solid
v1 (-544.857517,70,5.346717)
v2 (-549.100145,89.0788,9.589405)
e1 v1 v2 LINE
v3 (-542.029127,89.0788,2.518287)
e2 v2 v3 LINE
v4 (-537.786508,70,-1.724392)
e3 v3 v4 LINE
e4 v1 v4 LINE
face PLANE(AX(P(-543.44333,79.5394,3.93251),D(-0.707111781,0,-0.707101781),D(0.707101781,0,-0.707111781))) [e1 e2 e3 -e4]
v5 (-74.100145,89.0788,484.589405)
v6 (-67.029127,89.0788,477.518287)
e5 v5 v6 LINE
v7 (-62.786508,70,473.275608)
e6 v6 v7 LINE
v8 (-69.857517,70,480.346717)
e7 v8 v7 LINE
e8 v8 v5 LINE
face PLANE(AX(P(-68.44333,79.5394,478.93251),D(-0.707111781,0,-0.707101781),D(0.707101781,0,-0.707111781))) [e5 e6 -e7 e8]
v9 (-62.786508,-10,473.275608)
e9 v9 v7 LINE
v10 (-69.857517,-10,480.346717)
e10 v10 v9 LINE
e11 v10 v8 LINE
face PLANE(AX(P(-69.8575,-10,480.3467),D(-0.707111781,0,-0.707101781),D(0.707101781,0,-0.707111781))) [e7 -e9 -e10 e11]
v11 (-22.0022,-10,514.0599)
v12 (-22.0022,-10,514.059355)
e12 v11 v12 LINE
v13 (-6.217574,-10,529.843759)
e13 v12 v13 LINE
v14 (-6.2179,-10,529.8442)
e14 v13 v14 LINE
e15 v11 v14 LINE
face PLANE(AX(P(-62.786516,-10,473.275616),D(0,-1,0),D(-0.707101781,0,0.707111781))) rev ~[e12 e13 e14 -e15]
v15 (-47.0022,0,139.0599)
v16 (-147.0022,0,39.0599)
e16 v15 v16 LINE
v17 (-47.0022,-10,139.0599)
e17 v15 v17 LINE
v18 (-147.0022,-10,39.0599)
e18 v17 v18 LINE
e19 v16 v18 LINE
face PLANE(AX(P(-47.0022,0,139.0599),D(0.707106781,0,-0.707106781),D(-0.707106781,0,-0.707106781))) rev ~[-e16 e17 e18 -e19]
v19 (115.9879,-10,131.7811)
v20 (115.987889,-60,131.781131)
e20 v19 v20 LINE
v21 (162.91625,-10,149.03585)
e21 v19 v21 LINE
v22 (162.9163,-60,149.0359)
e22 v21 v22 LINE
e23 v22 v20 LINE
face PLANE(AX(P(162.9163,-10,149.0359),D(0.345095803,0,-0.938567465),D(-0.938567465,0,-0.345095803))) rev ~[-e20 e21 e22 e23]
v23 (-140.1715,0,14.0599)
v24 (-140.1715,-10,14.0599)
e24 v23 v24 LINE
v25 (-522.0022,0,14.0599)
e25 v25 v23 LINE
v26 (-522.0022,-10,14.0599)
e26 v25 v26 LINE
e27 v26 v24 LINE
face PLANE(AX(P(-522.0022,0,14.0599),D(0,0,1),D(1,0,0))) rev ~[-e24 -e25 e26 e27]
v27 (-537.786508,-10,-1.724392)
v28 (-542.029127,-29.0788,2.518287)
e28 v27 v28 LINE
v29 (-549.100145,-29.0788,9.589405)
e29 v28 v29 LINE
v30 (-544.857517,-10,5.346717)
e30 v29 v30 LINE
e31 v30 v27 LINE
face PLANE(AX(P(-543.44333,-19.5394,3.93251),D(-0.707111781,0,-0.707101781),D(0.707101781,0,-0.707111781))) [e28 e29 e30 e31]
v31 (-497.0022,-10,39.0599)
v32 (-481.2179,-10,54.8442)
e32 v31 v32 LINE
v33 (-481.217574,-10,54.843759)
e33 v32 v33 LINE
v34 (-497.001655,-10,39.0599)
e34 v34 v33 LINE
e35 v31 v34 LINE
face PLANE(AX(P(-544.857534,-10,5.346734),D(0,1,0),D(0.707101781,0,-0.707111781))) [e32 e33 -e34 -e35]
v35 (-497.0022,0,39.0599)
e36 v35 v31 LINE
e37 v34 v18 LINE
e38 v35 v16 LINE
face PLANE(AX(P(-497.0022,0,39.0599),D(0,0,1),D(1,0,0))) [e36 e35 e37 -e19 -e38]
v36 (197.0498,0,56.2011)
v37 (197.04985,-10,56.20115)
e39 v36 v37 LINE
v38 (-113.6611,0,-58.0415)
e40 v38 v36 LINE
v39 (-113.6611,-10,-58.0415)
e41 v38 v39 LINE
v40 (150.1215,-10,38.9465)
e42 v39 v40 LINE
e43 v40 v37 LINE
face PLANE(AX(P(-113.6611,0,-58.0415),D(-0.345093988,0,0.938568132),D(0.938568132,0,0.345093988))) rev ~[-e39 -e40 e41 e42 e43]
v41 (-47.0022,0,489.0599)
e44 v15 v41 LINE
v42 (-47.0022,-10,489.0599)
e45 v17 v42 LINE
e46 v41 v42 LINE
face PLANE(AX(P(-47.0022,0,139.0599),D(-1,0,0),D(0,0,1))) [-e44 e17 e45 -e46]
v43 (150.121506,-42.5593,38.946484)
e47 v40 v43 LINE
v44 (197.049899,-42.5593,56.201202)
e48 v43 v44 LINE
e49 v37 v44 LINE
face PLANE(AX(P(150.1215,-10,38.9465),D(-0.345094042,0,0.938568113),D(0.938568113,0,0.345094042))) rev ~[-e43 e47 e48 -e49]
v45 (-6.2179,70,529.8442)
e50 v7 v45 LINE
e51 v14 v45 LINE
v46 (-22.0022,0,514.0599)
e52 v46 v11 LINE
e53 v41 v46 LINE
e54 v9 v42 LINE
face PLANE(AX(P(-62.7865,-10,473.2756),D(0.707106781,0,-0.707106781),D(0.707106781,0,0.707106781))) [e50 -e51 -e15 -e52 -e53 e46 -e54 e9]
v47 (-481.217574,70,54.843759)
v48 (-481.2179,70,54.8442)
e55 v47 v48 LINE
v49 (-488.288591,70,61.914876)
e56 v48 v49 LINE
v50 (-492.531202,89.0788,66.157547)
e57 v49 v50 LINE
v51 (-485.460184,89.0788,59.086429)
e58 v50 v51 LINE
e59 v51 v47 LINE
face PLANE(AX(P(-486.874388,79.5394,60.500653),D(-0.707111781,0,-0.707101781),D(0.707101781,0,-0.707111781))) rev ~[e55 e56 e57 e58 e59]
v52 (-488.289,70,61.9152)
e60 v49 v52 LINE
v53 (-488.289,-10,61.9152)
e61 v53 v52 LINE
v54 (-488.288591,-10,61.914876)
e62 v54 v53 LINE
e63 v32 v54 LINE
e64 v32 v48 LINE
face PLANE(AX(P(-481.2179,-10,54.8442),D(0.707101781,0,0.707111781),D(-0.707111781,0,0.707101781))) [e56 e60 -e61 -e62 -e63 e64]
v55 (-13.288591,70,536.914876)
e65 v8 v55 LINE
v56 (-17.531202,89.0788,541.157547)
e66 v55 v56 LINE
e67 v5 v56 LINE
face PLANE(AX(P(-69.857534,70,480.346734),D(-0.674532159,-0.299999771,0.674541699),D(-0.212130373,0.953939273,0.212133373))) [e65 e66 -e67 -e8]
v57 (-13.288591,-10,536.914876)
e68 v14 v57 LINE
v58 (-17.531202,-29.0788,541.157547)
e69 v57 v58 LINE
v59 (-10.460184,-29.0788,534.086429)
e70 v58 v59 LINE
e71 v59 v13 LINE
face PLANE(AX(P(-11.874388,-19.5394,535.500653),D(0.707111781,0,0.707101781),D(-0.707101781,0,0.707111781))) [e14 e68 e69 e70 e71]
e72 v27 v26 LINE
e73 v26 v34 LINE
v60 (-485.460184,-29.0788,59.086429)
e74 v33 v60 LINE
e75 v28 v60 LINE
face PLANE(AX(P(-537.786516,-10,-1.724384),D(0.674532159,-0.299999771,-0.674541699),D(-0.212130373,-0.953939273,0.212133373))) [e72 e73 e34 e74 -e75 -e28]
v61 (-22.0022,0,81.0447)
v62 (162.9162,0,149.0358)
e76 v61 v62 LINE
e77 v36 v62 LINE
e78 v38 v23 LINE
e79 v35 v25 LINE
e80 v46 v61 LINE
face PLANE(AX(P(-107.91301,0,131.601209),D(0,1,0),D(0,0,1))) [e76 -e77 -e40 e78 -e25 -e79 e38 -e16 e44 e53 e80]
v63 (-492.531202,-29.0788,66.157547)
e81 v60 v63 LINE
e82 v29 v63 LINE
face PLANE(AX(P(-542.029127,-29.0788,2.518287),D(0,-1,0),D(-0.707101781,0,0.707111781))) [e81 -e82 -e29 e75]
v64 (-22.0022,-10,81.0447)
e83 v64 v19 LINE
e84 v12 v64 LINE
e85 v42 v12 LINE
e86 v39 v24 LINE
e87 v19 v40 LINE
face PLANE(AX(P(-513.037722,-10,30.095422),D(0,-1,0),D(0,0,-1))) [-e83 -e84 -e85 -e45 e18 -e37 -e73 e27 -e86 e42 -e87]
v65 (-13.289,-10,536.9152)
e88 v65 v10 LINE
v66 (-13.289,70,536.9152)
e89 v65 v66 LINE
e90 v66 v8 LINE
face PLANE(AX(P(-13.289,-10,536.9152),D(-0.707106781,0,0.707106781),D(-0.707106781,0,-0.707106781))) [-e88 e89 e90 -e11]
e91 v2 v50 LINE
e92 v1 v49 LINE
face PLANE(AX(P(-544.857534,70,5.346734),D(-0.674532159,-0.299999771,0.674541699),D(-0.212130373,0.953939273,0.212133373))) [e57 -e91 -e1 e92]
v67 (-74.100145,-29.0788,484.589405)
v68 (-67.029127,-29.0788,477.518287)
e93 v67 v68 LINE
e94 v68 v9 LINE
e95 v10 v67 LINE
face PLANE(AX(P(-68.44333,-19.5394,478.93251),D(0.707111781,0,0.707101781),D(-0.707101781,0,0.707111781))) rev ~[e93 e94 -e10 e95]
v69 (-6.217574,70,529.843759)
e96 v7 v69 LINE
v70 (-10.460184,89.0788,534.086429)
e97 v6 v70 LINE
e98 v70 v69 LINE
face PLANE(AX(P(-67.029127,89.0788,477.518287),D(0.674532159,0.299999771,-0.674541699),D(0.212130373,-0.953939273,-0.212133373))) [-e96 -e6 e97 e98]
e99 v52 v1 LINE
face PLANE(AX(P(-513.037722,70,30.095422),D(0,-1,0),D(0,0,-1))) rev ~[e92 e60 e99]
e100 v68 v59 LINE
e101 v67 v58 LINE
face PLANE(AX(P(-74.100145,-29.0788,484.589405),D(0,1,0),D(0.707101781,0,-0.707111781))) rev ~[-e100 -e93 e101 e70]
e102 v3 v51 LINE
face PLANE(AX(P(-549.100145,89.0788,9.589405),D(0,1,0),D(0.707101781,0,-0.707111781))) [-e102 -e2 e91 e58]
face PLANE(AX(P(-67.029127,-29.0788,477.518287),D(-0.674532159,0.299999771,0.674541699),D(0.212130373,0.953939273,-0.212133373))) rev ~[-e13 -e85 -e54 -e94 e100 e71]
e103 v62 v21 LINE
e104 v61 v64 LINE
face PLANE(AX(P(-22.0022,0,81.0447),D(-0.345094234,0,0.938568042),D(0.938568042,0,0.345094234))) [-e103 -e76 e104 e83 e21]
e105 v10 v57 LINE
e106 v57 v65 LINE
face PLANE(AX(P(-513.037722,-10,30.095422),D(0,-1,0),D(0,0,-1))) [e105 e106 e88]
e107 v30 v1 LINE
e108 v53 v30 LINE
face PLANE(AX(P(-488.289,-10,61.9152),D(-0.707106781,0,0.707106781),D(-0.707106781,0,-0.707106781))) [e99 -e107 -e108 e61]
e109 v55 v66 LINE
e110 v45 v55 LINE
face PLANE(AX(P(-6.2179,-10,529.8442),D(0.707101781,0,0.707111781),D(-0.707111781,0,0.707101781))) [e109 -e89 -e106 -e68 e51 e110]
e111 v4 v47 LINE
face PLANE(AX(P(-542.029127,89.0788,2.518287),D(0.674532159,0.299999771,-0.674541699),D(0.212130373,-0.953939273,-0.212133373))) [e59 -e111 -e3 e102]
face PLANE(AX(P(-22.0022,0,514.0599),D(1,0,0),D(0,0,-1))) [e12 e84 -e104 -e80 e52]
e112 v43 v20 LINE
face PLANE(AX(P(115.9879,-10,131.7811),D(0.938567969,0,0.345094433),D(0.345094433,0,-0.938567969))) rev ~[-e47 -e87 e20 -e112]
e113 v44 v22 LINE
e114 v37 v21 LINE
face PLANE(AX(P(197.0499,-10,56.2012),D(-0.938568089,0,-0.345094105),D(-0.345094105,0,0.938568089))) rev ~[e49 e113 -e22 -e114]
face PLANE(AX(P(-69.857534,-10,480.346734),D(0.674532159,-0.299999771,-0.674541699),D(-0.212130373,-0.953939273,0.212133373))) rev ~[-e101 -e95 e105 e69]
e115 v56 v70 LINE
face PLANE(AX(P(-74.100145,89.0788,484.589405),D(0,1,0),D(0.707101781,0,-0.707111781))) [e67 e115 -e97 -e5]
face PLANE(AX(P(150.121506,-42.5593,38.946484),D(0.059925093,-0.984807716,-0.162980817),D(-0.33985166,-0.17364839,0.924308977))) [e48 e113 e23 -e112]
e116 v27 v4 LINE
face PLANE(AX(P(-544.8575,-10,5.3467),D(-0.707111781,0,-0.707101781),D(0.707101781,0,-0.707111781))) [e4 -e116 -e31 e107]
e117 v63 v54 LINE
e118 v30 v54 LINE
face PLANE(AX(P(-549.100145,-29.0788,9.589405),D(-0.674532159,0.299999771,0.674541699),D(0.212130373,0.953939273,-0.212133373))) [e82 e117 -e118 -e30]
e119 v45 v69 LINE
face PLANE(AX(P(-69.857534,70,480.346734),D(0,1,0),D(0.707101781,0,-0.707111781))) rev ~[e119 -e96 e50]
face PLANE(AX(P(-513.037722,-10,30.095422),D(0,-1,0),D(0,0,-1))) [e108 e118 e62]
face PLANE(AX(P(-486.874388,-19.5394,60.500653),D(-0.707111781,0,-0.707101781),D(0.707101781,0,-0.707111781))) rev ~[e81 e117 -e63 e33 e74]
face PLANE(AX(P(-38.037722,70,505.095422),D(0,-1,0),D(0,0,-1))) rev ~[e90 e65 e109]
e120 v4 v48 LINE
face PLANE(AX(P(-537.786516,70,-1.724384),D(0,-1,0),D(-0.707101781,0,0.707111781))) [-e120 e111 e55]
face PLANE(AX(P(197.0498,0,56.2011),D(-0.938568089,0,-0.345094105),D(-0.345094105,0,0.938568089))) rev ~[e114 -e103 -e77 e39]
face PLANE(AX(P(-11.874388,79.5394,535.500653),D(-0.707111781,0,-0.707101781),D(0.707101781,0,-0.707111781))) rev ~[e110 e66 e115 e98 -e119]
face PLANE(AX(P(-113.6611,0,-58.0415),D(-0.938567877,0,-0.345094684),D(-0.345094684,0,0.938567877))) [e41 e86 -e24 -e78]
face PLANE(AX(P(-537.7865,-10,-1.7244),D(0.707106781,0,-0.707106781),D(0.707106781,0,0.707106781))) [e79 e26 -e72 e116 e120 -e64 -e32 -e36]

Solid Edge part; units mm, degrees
sketch "Sketch1" plane through (0, 0, 0) normal (0, -1, 0) x (1, 0, 0)
  line L0 (-47.0022, 489.0599) -> (-22.0022, 514.0599)
  line L1 (-22.0022, 514.0599) -> (-22.0022, 81.0447)
  line L2 (-22.0022, 81.0447) -> (162.9162, 149.0358)
  line L3 (197.0498, 56.2011) -> (162.9162, 149.0358)
  line L4 (-113.6611, -58.0415) -> (197.0498, 56.2011)
  line L5 (-113.6611, -58.0415) -> (-140.1715, 14.0599)
  line L6 (-522.0022, 14.0599) -> (-140.1715, 14.0599)
  line L7 (-497.0022, 39.0599) -> (-522.0022, 14.0599)
  line L8 (-497.0022, 39.0599) -> (-147.0022, 39.0599)
  line L9 (-47.0022, 139.0599) -> (-147.0022, 39.0599)
  line L10 (-47.0022, 139.0599) -> (-47.0022, 489.0599)
  dimension "D1" = 350
extrude "Protrusion1" add sketch "Sketch1" along normal blind 10
sketch "Sketch2" plane through (-272.0022, -10, 264.0599) normal (0, -1, 0) x (0, 0, 1)
  line L0 (-265.7843, 265.7843) -> (-209.2157, 209.2157)
  line L1 (-209.2157, 209.2157) -> (-202.1447, 216.2868)
  line L2 (-202.1447, 216.2868) -> (-258.7132, 272.8553)
  line L3 (-258.7132, 272.8553) -> (-265.7843, 265.7843)
  line L4 (209.2157, -209.2157) -> (265.7843, -265.7843)
  line L5 (265.7843, -265.7843) -> (272.8553, -258.7132)
  line L6 (272.8553, -258.7132) -> (216.2868, -202.1447)
  line L7 (216.2868, -202.1447) -> (209.2157, -209.2157)
  dimension "D1" = 10
  dimension "D2" = 80
  dimension "D3" = 10
  dimension "D4" = 80
extrude "ExtrudedProtrusion_2" add sketch "Sketch2" against normal blind 80
sketch "Sketch3" plane through (-173.9038, -10, 239.4369) normal (0, -1, 0) x (1, 0, 0)
  line L0 (289.8917, -107.6558) -> (324.0253, -200.4904)
  line L1 (324.0253, -200.4904) -> (370.9537, -183.2357)
  line L2 (370.9537, -183.2357) -> (336.8201, -90.401)
  line L3 (336.8201, -90.401) -> (289.8917, -107.6558)
  dimension "D1" = 50
  dimension "D2" = 98.911
extrude "ExtrudedProtrusion_3" add sketch "Sketch3" along normal blind 50
sketch "Sketch4" plane through (-66.322, 10, 476.8112) normal (-0.7071068, 0, -0.7071068) x (0, -1, 0)
  line L0 (20, 5) -> (39.0788, 11)
  line L1 (39.0788, 11) -> (39.0788, 1)
  line L2 (39.0788, 1) -> (20, -5)
  line L3 (20, -5) -> (20, 5)
  line L4 (-60, 5) -> (-79.0788, 11)
  line L5 (-79.0788, 11) -> (-79.0788, 1)
  line L6 (-79.0788, 1) -> (-60, -5)
  line L7 (-60, 5) -> (-60, -5)
  dimension "D1" = 10
  dimension "D2" = 20
  dimension "D3" = 6
extrude "ExtrudedProtrusion_4" add sketch "Sketch4" against normal blind 80
sketch "Sketch5" plane through (-541.322, 30, 1.8112) normal (-0.7071068, 0, -0.7071068) x (0, -1, 0)
  line L0 (-40, 5) -> (-59.0788, 11)
  line L1 (-59.0788, 11) -> (-59.0788, 1)
  line L2 (-59.0788, 1) -> (-40, -5)
  line L3 (-40, -5) -> (-40, 5)
  line L4 (40, 5) -> (40, -5)
  line L5 (40, -5) -> (59.0788, 1)
  line L6 (59.0788, 1) -> (59.0788, 11)
  line L7 (59.0788, 11) -> (40, 5)
extrude "ExtrudedProtrusion_5" add sketch "Sketch5" against normal blind 80
sketch "Sketch6" plane through (133.0546, -35, 85.3638) normal (-0.9385681, 0, -0.3450941) x (0, -1, 0)
  line L0 (25, 49.4555) -> (25, -49.4555)
  line L1 (25, -49.4555) -> (7.5593, -49.4555)
  line L2 (7.5593, -49.4555) -> (25, 49.4555)
extrude "Cutout1" cut sketch "Sketch6" against normal through all
